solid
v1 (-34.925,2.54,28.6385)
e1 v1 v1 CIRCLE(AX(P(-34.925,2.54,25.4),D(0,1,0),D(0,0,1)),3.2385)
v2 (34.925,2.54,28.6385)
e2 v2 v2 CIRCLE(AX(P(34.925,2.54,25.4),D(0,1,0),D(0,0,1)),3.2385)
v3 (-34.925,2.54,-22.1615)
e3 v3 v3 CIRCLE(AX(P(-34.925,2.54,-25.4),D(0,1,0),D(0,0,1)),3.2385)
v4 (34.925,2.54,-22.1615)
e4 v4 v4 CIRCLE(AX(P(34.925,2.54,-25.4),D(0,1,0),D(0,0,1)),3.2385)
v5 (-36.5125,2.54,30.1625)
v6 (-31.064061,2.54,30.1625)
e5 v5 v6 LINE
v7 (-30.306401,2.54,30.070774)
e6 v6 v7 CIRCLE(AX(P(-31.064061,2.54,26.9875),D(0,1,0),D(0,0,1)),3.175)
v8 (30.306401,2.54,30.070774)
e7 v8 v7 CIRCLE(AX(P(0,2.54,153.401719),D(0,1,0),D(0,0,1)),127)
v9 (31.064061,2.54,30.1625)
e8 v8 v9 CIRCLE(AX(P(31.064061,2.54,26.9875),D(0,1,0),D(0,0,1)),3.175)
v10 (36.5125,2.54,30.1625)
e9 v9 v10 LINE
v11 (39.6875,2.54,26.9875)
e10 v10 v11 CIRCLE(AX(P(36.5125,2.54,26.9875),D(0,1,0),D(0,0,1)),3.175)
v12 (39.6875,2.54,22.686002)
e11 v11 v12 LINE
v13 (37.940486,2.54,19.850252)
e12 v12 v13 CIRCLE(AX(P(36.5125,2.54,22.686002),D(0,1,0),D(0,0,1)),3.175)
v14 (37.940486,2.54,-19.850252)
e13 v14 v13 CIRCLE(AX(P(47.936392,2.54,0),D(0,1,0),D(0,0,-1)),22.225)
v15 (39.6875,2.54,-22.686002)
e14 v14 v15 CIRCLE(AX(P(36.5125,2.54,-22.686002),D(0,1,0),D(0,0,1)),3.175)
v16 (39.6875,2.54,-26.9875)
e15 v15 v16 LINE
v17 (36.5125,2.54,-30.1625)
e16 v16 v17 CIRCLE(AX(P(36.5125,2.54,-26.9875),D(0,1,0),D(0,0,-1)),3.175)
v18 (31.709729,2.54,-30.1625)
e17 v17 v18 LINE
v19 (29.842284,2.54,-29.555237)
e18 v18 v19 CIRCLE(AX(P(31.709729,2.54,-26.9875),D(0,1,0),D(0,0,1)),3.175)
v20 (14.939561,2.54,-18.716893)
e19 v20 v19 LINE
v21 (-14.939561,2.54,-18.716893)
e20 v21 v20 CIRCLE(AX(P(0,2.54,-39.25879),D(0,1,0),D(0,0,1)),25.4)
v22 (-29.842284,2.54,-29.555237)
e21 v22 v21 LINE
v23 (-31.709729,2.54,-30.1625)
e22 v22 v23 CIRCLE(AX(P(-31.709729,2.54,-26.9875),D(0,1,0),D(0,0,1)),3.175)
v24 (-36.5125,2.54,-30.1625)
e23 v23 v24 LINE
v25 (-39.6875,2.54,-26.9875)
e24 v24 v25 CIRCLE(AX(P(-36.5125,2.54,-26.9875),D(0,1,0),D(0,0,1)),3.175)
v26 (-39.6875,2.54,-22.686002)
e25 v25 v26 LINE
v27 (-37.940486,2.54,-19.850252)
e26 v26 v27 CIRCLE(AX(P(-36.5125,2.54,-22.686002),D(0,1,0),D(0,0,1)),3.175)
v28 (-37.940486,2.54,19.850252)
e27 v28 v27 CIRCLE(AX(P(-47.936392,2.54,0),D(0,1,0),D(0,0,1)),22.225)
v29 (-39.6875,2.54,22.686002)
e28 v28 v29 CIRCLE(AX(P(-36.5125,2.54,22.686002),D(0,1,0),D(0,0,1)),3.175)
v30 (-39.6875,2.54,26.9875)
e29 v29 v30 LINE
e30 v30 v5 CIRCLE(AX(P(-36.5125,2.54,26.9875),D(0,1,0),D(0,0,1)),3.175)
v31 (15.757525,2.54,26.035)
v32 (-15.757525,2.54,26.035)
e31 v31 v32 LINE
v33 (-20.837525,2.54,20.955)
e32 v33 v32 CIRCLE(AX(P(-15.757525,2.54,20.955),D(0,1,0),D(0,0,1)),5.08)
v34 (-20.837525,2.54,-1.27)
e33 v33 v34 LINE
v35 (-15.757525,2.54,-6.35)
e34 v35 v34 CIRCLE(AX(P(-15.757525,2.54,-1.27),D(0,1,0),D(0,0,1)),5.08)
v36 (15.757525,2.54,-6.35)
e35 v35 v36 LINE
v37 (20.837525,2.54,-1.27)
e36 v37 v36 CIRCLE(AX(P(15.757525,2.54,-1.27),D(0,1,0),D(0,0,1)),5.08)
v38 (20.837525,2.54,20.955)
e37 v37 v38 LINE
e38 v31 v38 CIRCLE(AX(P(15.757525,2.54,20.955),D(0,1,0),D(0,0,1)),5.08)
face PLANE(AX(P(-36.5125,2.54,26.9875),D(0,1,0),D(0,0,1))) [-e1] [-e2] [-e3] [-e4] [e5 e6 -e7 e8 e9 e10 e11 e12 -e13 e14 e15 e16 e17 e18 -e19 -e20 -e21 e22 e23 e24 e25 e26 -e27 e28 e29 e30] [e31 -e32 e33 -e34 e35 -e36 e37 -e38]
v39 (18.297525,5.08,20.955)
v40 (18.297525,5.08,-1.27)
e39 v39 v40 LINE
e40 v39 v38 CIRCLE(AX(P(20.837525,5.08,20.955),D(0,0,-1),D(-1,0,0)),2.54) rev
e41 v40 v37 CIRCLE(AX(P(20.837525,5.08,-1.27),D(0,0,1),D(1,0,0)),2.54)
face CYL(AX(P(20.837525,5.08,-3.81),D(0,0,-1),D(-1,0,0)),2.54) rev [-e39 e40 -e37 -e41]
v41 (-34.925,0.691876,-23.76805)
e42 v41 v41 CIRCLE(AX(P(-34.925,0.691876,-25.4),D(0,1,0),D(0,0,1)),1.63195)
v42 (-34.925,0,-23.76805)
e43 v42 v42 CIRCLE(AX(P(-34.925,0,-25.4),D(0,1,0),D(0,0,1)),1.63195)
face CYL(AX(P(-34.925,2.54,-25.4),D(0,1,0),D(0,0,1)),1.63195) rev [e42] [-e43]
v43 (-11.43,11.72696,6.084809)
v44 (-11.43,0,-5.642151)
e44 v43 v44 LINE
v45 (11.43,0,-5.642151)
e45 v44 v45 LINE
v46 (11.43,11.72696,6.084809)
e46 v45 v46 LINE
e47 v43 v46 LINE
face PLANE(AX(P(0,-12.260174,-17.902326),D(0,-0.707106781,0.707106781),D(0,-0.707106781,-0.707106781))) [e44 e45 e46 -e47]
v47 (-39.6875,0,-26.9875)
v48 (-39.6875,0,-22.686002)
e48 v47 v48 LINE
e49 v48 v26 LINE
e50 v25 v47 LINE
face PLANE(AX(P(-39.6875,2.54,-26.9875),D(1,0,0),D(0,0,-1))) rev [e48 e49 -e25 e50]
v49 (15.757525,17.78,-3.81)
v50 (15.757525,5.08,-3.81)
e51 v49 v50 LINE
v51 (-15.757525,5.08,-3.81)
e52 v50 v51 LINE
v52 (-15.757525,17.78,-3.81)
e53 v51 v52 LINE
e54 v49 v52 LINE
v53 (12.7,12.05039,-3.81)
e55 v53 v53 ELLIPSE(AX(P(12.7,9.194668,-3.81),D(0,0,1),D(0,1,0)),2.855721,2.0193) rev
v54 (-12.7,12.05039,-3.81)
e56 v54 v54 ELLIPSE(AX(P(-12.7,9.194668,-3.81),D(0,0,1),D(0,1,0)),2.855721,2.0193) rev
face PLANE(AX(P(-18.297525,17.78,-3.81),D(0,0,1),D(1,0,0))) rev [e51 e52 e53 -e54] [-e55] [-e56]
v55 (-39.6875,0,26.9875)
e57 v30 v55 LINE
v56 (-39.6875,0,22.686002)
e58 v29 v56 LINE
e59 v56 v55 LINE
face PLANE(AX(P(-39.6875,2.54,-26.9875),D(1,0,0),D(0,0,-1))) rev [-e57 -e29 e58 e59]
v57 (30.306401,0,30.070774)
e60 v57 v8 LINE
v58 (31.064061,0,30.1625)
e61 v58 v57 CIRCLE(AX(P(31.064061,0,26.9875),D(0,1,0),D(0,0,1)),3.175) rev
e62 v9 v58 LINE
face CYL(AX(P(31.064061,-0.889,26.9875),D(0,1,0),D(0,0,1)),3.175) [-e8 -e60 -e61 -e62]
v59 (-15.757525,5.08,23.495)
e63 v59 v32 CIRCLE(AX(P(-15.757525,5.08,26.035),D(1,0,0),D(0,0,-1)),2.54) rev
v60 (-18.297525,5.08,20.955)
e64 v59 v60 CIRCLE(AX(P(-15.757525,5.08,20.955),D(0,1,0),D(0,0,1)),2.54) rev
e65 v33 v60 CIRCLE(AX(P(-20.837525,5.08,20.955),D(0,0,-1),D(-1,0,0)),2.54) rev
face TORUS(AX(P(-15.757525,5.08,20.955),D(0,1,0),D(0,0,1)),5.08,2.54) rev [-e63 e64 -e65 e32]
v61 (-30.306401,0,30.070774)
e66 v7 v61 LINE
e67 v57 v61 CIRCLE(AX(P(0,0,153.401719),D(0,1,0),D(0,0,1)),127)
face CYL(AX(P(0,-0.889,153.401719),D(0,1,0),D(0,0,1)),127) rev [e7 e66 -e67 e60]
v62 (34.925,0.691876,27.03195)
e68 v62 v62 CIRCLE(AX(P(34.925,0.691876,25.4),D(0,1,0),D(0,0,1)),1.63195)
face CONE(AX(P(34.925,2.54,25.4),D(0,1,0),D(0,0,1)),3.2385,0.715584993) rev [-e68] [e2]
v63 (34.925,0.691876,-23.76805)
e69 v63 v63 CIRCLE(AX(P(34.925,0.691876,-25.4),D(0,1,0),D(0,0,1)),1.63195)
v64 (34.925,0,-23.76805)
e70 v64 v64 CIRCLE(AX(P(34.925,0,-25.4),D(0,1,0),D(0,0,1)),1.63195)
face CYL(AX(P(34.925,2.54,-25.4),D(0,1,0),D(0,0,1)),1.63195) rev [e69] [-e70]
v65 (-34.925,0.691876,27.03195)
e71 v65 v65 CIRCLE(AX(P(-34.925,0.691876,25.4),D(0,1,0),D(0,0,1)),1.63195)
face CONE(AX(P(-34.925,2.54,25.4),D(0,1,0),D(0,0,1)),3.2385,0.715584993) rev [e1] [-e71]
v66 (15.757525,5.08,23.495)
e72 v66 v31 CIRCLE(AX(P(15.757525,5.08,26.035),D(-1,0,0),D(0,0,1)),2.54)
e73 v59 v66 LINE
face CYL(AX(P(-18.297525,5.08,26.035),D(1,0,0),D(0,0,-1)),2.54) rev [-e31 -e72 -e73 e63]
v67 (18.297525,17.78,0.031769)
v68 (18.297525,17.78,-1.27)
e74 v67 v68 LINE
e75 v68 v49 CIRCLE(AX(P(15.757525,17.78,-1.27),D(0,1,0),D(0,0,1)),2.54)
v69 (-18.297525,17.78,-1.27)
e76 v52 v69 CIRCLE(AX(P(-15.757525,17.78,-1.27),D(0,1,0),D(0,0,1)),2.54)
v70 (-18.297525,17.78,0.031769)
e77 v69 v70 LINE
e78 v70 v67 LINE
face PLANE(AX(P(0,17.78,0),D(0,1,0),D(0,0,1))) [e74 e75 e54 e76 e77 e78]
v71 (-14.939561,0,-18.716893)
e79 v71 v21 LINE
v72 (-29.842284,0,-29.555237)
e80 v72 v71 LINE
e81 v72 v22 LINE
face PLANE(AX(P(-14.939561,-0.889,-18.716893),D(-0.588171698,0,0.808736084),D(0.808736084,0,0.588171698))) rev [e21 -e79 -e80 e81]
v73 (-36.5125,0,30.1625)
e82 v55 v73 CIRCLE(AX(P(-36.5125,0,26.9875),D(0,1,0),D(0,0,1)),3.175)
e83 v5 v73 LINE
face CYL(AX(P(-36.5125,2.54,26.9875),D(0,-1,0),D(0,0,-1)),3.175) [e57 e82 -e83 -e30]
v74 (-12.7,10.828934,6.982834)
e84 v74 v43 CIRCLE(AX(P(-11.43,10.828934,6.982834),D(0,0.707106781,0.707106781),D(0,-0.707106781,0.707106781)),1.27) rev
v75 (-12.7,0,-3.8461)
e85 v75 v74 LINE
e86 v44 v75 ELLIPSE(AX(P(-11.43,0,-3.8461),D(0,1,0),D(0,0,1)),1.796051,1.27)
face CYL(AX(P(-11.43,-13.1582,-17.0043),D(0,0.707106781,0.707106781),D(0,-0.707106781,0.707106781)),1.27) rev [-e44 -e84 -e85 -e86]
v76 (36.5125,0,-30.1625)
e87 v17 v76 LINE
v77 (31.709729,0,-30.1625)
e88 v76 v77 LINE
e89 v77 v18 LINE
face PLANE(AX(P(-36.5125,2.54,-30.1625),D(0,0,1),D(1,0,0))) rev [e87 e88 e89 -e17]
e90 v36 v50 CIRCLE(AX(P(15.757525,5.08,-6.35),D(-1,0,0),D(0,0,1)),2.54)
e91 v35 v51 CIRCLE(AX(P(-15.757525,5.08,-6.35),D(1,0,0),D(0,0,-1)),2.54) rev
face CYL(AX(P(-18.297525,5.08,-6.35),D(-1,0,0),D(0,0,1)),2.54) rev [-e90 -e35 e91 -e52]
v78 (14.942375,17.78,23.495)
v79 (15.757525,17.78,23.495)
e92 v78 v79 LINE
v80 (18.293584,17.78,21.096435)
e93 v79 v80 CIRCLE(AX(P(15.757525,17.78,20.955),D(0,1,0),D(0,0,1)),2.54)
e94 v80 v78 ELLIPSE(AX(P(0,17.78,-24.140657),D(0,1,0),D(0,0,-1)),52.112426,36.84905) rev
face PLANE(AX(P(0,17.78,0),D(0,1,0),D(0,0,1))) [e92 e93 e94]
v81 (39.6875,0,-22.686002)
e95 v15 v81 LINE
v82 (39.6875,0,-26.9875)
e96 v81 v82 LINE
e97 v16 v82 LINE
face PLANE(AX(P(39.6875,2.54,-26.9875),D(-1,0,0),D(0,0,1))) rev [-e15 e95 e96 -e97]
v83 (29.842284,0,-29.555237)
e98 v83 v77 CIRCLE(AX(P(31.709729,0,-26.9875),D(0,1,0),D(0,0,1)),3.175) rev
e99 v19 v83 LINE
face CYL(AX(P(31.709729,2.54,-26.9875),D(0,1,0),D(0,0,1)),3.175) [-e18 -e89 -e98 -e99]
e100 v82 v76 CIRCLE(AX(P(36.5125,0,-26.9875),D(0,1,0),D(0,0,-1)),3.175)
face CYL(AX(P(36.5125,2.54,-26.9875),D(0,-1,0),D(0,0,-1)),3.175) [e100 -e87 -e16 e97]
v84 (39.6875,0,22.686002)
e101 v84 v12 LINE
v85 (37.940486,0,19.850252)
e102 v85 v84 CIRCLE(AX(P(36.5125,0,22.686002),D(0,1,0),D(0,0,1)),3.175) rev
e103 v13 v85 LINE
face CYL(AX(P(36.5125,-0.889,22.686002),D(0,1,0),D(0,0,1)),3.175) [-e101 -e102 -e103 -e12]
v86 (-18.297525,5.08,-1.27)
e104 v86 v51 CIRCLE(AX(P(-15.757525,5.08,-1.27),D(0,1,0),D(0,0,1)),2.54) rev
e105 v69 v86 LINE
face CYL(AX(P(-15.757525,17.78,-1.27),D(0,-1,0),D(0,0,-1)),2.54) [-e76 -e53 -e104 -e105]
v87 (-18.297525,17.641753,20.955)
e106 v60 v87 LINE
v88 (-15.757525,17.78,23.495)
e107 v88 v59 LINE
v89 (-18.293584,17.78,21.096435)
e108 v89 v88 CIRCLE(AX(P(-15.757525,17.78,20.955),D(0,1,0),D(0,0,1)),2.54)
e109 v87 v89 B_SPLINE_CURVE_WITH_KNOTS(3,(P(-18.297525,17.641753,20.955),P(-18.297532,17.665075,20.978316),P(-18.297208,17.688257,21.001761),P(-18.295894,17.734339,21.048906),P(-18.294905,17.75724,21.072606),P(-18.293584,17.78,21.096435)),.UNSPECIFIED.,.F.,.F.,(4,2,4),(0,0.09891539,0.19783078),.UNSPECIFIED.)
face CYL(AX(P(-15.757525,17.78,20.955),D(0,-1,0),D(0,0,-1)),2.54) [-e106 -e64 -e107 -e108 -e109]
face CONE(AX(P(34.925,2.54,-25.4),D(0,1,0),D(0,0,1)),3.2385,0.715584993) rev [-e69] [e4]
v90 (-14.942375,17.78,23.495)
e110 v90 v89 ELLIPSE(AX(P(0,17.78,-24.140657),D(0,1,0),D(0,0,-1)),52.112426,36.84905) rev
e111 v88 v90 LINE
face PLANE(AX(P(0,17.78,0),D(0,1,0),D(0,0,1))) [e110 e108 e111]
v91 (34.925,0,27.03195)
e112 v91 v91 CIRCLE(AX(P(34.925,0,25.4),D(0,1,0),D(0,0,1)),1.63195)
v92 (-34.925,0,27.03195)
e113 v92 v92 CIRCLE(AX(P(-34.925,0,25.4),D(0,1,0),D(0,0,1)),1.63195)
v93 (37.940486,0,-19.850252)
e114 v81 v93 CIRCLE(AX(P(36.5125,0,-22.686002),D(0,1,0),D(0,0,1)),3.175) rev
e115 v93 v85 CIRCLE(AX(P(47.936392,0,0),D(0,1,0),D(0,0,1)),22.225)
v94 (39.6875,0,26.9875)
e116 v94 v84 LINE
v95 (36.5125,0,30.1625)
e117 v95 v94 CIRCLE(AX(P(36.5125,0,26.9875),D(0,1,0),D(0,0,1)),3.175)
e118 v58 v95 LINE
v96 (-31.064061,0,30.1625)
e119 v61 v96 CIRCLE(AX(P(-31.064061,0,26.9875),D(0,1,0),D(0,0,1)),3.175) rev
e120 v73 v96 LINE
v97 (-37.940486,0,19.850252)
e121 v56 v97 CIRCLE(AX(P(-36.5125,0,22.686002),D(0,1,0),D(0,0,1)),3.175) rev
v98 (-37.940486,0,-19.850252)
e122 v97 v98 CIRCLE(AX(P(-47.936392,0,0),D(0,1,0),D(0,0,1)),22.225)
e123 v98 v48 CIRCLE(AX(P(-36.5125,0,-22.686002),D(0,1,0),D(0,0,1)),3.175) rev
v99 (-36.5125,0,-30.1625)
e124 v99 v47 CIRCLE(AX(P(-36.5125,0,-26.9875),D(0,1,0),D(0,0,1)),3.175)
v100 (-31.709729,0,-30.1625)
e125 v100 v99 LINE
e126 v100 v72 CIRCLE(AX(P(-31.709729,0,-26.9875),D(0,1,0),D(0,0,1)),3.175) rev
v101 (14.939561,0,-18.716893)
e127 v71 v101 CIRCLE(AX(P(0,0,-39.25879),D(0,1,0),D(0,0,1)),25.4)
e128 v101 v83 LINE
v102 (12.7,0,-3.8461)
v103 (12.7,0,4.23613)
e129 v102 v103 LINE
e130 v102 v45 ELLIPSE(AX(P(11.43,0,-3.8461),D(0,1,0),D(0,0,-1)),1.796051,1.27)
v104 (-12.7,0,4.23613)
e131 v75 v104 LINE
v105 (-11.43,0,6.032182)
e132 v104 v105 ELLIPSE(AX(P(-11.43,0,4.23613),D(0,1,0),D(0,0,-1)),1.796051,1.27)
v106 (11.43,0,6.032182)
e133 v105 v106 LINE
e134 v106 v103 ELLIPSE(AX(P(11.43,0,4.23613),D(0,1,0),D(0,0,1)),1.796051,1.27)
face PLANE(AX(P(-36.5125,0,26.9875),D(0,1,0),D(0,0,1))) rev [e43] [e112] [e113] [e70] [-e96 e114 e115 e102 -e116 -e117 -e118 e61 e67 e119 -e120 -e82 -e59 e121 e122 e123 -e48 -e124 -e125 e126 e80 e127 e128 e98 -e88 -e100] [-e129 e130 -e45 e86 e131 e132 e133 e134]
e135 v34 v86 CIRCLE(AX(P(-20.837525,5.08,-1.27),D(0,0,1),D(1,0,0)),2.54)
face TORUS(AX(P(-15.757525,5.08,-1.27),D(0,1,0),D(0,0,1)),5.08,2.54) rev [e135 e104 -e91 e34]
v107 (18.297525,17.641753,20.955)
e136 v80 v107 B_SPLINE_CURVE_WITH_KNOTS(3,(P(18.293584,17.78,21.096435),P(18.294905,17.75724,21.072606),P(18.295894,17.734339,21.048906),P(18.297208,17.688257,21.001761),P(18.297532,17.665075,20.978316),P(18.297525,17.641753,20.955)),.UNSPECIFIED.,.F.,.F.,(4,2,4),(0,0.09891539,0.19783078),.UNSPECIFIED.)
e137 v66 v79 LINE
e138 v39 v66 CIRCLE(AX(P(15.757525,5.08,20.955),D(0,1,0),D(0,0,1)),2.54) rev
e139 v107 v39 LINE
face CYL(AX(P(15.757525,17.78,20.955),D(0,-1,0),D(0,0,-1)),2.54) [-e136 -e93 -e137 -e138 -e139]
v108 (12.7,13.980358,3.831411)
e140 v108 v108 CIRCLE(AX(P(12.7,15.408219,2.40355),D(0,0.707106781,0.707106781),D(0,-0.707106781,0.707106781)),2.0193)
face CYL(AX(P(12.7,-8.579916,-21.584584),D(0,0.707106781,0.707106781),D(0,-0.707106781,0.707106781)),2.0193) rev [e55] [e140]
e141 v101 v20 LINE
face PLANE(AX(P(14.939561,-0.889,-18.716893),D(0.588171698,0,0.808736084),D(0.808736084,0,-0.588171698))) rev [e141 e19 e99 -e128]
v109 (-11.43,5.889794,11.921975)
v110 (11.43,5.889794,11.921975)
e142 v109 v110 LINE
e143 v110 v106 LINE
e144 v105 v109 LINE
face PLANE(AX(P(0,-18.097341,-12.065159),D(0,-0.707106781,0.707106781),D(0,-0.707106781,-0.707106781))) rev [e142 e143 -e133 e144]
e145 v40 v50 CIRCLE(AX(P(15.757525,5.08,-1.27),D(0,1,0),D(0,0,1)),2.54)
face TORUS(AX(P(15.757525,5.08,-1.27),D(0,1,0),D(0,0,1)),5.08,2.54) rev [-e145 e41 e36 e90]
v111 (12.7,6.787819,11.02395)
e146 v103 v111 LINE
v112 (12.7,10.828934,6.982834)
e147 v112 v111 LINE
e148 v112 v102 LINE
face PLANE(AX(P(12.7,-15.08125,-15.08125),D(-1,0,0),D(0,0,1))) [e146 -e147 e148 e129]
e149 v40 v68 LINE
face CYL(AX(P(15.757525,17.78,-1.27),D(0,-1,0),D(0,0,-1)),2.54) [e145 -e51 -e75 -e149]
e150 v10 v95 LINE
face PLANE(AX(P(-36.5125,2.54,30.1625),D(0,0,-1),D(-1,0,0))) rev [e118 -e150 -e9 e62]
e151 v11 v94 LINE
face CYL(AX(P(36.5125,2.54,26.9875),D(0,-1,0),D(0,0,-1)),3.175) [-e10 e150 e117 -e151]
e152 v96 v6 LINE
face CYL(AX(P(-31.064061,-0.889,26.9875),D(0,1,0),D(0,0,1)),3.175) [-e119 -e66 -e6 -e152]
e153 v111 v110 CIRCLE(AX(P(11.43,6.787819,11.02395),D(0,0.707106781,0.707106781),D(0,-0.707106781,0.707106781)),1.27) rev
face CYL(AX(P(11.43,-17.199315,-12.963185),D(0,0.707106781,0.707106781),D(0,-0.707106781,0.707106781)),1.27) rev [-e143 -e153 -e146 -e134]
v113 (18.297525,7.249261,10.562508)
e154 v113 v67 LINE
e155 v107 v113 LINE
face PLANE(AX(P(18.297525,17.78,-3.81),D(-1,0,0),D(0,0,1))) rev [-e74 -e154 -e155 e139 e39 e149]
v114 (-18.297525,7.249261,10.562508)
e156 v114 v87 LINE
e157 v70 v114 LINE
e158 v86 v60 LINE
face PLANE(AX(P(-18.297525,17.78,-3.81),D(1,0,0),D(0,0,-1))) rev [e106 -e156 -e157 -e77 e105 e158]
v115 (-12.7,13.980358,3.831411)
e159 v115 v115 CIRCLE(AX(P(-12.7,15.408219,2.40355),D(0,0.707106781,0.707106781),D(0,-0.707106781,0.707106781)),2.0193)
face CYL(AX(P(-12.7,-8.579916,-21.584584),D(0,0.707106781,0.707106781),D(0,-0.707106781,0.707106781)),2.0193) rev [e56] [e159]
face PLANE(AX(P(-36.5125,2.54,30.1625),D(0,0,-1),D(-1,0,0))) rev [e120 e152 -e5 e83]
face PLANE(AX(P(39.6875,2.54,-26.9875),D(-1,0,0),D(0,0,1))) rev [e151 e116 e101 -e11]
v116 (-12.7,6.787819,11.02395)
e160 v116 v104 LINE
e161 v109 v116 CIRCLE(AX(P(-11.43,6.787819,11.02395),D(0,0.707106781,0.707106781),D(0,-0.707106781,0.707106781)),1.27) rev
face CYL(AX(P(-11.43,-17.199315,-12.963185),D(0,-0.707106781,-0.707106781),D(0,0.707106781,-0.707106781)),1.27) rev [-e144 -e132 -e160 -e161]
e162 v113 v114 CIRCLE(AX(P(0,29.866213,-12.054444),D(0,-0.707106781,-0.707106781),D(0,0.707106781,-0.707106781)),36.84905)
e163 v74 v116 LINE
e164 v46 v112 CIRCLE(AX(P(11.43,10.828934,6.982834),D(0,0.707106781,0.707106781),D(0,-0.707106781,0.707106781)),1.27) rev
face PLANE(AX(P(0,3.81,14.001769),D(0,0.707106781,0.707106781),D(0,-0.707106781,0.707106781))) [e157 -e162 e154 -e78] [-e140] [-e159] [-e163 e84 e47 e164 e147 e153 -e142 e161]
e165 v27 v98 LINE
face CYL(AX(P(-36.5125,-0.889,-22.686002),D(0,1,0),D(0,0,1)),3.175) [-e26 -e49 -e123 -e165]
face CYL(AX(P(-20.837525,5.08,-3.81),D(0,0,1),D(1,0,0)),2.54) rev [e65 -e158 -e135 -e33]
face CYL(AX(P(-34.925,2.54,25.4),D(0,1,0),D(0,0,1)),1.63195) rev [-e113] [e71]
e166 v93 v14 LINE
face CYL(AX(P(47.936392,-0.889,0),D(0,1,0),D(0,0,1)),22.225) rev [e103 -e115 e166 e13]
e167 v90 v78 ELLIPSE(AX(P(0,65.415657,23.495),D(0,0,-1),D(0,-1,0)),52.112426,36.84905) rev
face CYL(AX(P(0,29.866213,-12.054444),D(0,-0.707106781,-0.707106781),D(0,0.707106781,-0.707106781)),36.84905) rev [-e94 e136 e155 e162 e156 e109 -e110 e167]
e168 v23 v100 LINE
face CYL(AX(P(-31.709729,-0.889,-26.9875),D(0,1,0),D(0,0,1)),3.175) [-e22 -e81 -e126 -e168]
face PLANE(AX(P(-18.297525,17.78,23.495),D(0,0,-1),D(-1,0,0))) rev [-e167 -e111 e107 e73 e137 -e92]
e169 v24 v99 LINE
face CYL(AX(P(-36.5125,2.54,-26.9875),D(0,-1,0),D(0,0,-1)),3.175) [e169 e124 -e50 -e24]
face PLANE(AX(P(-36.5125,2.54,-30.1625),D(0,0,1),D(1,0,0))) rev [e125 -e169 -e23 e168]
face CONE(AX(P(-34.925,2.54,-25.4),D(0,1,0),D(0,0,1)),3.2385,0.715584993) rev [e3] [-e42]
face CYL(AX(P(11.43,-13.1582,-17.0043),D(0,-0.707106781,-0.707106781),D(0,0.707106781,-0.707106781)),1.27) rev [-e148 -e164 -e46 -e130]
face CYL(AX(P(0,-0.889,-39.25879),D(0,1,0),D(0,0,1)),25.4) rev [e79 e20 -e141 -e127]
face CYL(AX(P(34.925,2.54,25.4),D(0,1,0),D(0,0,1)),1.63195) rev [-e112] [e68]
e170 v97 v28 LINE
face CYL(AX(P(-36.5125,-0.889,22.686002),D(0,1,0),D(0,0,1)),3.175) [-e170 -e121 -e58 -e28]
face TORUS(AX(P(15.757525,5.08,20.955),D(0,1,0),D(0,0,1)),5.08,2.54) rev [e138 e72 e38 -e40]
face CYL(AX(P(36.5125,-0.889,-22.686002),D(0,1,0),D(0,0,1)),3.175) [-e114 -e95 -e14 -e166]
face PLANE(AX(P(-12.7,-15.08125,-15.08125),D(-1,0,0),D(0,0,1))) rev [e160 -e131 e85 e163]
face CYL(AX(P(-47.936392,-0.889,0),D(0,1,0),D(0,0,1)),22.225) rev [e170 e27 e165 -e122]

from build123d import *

# Parameters (mm, degrees)
BOSS_EXTRUDE1_DEPTH                           = 2.54
CSK_FOR_4_FLAT_HEAD_MACHINE_SCREW1_AT_2_COUNT = 2
CSK_FOR_4_FLAT_HEAD_MACHINE_SCREW1_AT_2_PITCH = 50.8
CSK_FOR_4_FLAT_HEAD_MACHINE_SCREW1_AT_3_COUNT = 2
CSK_FOR_4_FLAT_HEAD_MACHINE_SCREW1_AT_3_PITCH = 86.36933773
CSK_FOR_4_FLAT_HEAD_MACHINE_SCREW1_AT_4_COUNT = 2
CSK_FOR_4_FLAT_HEAD_MACHINE_SCREW1_AT_4_PITCH = 69.85
SKETCH5_W                                     = 36.59505
SKETCH5_H                                     = 27.305
BOSS_EXTRUDE2_DEPTH                           = 15.24
CUT_EXTRUDE2_REACH                            = 58.398
SKETCH8_R                                     = 2.0193
FILLET1_R                                     = 2.54
CUT_EXTRUDE4_DEPTH                            = 3.429
FILLET2_R                                     = 3.175
SKETCH10_W                                    = 25.4
SKETCH10_H                                    = 8.255
CUT_EXTRUDE5_DEPTH                            = 57.398148028
FILLET3_R                                     = 1.27


with BuildPart() as part:
    # Sketch1 → Boss-Extrude1 (new body)
    with BuildSketch(Plane(origin=(0, 0, 0), x_dir=(1, 0, 0), z_dir=(0, 1, 0))):
        with BuildLine():
            Line((-36.5125, 30.1625), (36.5125, 30.1625))
            ThreePointArc((36.5125, 30.1625), (38.75756403, 29.23256403), (39.6875, 26.9875))
            Line((39.6875, 26.9875), (39.6875, -26.9875))
            ThreePointArc((39.6875, -26.9875), (38.75756403, -29.23256403), (36.5125, -30.1625))
            Line((36.5125, -30.1625), (-36.5125, -30.1625))
            ThreePointArc((-36.5125, -30.1625), (-38.75756403, -29.23256403), (-39.6875, -26.9875))
            Line((-39.6875, -26.9875), (-39.6875, 26.9875))
            ThreePointArc((-39.6875, 26.9875), (-38.75756403, 29.23256403), (-36.5125, 30.1625))
        make_face()
    extrude(amount=BOSS_EXTRUDE1_DEPTH)

    # Sketch3 → CSK for #4 Flat Head Machine Screw1 (revolve, cut)
    with BuildSketch(Plane(origin=(-34.925, 2.54, -25.4), x_dir=(0, 0, 1), z_dir=(1, 0, 0))):
        Polygon((0, 0), (0, 2.54), (1.63195, 2.54), (1.63195, 1.848124365), (3.2385, 0), align=None)
    csk_for_4_flat_head_machine_screw1 = revolve(axis=Axis((-34.925, 8.89, -25.4), (0, -1, 0)), mode=Mode.SUBTRACT)

    # CSK for #4 Flat Head Machine Screw1 at 2: CSK for #4 Flat Head Machine Screw1 ×2
    with Locations(*[(0, 0, i * CSK_FOR_4_FLAT_HEAD_MACHINE_SCREW1_AT_2_PITCH) for i in range(1, CSK_FOR_4_FLAT_HEAD_MACHINE_SCREW1_AT_2_COUNT)]):
        add(csk_for_4_flat_head_machine_screw1, mode=Mode.SUBTRACT)

    # CSK for #4 Flat Head Machine Screw1 at 3: CSK for #4 Flat Head Machine Screw1 ×2
    with Locations(*[Vector(0.8087360843031886, 0, 0.5881716976750463) * (i * CSK_FOR_4_FLAT_HEAD_MACHINE_SCREW1_AT_3_PITCH) for i in range(1, CSK_FOR_4_FLAT_HEAD_MACHINE_SCREW1_AT_3_COUNT)]):
        add(csk_for_4_flat_head_machine_screw1, mode=Mode.SUBTRACT)

    # CSK for #4 Flat Head Machine Screw1 at 4: CSK for #4 Flat Head Machine Screw1 ×2
    with Locations(*[(i * CSK_FOR_4_FLAT_HEAD_MACHINE_SCREW1_AT_4_PITCH, 0, 0) for i in range(1, CSK_FOR_4_FLAT_HEAD_MACHINE_SCREW1_AT_4_COUNT)]):
        add(csk_for_4_flat_head_machine_screw1, mode=Mode.SUBTRACT)

    # Sketch5 → Boss-Extrude2 (add)
    with BuildSketch(Plane(origin=(0, 2.54, 0), x_dir=(1, 0, 0), z_dir=(0, 1, 0))):
        with Locations((0, -9.8425)):
            Rectangle(SKETCH5_W, SKETCH5_H)
    extrude(amount=BOSS_EXTRUDE2_DEPTH)

    # Sketch4 → Cut-Revolve1 (revolve, cut)
    with BuildSketch(Plane(origin=(0, 0, 0), x_dir=(0, 0, -1), z_dir=(1, 0, 0))):
        Polygon((-32.244261254, 22.052492284), (-6.188048119, 48.10870542), (12.054444166, 29.866213135), (-14.00176897, 3.81), align=None)
    revolve(axis=Axis((0, 29.866213135, -12.054444166), (0, 0.7071067811865511, 0.707106781186544)), mode=Mode.SUBTRACT)

    # Cut-Extrude2: up to this plane
    cut_extrude2_end = Plane(origin=(-18.297525, 17.78, -3.81), z_dir=(0, 0, 1))
    # Sketch8 → Cut-Extrude2 (cut, up to the surface)
    with BuildSketch(Plane(origin=(0, 8.905884485, 8.905884485), x_dir=(1, 0, 0), z_dir=(0, 0.7071067811865511, 0.707106781186544)), mode=Mode.PRIVATE) as cut_extrude2_sk1:
        with Locations(Location((-12.7, 9.195689, 0), (0, 0, 270))):
            Circle(SKETCH8_R)
    cut_extrude2_tool1 = split(extrude(cut_extrude2_sk1.sketch, amount=-CUT_EXTRUDE2_REACH, mode=Mode.PRIVATE), bisect_by=cut_extrude2_end, keep=Keep.BOTH, mode=Mode.PRIVATE)
    add(cut_extrude2_tool1.solids().sort_by_distance((-12.7, 15.408219, 2.40355))[0], mode=Mode.SUBTRACT)
    # Sketch8 → Cut-Extrude2 (cut, up to the surface)
    with BuildSketch(Plane(origin=(0, 8.905884485, 8.905884485), x_dir=(1, 0, 0), z_dir=(0, 0.7071067811865511, 0.707106781186544)), mode=Mode.PRIVATE) as cut_extrude2_sk2:
        with Locations(Location((12.7, 9.195689, 0), (0, 0, 270))):
            Circle(SKETCH8_R)
    cut_extrude2_tool2 = split(extrude(cut_extrude2_sk2.sketch, amount=-CUT_EXTRUDE2_REACH, mode=Mode.PRIVATE), bisect_by=cut_extrude2_end, keep=Keep.BOTH, mode=Mode.PRIVATE)
    add(cut_extrude2_tool2.solids().sort_by_distance((12.7, 15.408219, 2.40355))[0], mode=Mode.SUBTRACT)

    # Fillet1
    # the kernel refuses this fillet: 2.54 mm, written as the material it takes off along each edge
    with BuildSketch(Plane(origin=(18.297525, 2.54, -3.81), x_dir=(-1, 0, 0), z_dir=(0, 1, 0)), Plane(origin=(18.297525, 2.54, 23.495), x_dir=(0, 0, -1), z_dir=(0, 1, 0)), Plane(origin=(-18.297525, 2.54, 23.495), x_dir=(1, 0, 0), z_dir=(0, 1, 0))) as fillet1_piece_1:
        with BuildLine():
            CenterArc((FILLET1_R, FILLET1_R), FILLET1_R, 180, 90)
            Line((0, FILLET1_R), (0, 0))
            Line((0, 0), (FILLET1_R, 0))
        make_face()
    extrude(amount=21.59, mode=Mode.SUBTRACT)
    with BuildSketch(Plane(origin=(-18.297525, 2.54, -3.81), x_dir=(1, 0, 0), z_dir=(0, 1, 0))) as fillet1_piece_2:
        with BuildLine():
            CenterArc((FILLET1_R, -FILLET1_R), FILLET1_R, 90, 90)
            Line((0, -FILLET1_R), (0, 0))
            Line((0, 0), (FILLET1_R, 0))
        make_face()
    extrude(amount=21.59, mode=Mode.SUBTRACT)
    # the kernel refuses this fillet: 2.54 mm, written as the material it adds along each edge
    with BuildSketch(Plane(origin=(-15.757525, 2.54, -3.81), x_dir=(0, 0, -1), z_dir=(1, 0, 0)), Plane(origin=(15.757525, 2.54, 23.495), x_dir=(0, 0, 1), z_dir=(-1, 0, 0))) as fillet1_2_piece_1:
        with BuildLine():
            CenterArc((FILLET1_R, FILLET1_R), FILLET1_R, 180, 90)
            Line((0, FILLET1_R), (0, 0))
            Line((0, 0), (FILLET1_R, 0))
        make_face()
    extrude(amount=31.51505)
    with BuildSketch(Plane(origin=(18.297525, 2.54, -1.27), x_dir=(1, 0, 0), z_dir=(0, 0, 1)), Plane(origin=(-18.297525, 2.54, 20.955), x_dir=(-1, 0, 0), z_dir=(0, 0, -1))) as fillet1_2_piece_2:
        with BuildLine():
            CenterArc((FILLET1_R, FILLET1_R), FILLET1_R, 180, 90)
            Line((0, FILLET1_R), (0, 0))
            Line((0, 0), (FILLET1_R, 0))
        make_face()
    extrude(amount=22.225)
    with BuildSketch(Plane(origin=(-15.757525, 2.54, 20.955), x_dir=(0, 0, 1), z_dir=(1, 0, 0))) as fillet1_2_piece_3:
        with BuildLine():
            CenterArc((2.54 + FILLET1_R, -FILLET1_R), FILLET1_R, 90, 90)
            Line((2.54, -FILLET1_R), (2.54, 0))
            Line((2.54, 0), (2.54 + FILLET1_R, 0))
        make_face()
    revolve(axis=Axis((-15.757525, 2.54, 20.955), (0, -1, 0)), revolution_arc=90)
    with BuildSketch(Plane(origin=(-15.757525, 2.54, -1.27), x_dir=(0, 0, -1), z_dir=(1, 0, 0))) as fillet1_2_piece_4:
        with BuildLine():
            CenterArc((2.54 + FILLET1_R, FILLET1_R), FILLET1_R, 180, 90)
            Line((2.54, FILLET1_R), (2.54, 0))
            Line((2.54, 0), (2.54 + FILLET1_R, 0))
        make_face()
    revolve(axis=Axis((-15.757525, 2.54, -1.27), (0, 1, 0)), revolution_arc=90)
    with BuildSketch(Plane(origin=(15.757525, 2.54, 20.955), x_dir=(1, 0, 0), z_dir=(0, 0, -1))) as fillet1_2_piece_5:
        with BuildLine():
            CenterArc((2.54 + FILLET1_R, -FILLET1_R), FILLET1_R, 90, 90)
            Line((2.54, -FILLET1_R), (2.54, 0))
            Line((2.54, 0), (2.54 + FILLET1_R, 0))
        make_face()
    revolve(axis=Axis((15.757525, 2.54, 20.955), (0, -1, 0)), revolution_arc=90)
    with BuildSketch(Plane(origin=(15.757525, 2.54, -1.27), x_dir=(0, 0, -1), z_dir=(-1, 0, 0))) as fillet1_2_piece_6:
        with BuildLine():
            CenterArc((2.54 + FILLET1_R, -FILLET1_R), FILLET1_R, 90, 90)
            Line((2.54, -FILLET1_R), (2.54, 0))
            Line((2.54, 0), (2.54 + FILLET1_R, 0))
        make_face()
    revolve(axis=Axis((15.757525, 2.54, -1.27), (0, -1, 0)), revolution_arc=90)

    # Sketch9 → Cut-Extrude4 (cut)
    with BuildSketch(Plane(origin=(0, 2.54, 0), x_dir=(1, 0, 0), z_dir=(0, 1, 0))):
        with BuildLine():
            Line((-30.677270284, 30.1625), (30.677270284, 30.1625))
            Line((30.677270284, 30.1625), (14.939561121, 18.716893336))
            ThreePointArc((14.939561121, 18.716893336), (0, 13.858789877), (-14.939561121, 18.716893336))
            Line((-14.939561121, 18.716893336), (-30.677270284, 30.1625))
        make_face()
        with BuildLine():
            Line((-39.6875, 20.6375), (-39.6875, -20.6375))
            ThreePointArc((-39.6875, -20.6375), (-25.711391971, 0), (-39.6875, 20.6375))
        make_face()
        with BuildLine():
            Line((39.6875, 20.6375), (39.6875, -20.6375))
            ThreePointArc((39.6875, -20.6375), (25.711391971, 0), (39.6875, 20.6375))
        make_face()
        with BuildLine():
            Line((-30.677270284, -30.1625), (30.677270284, -30.1625))
            ThreePointArc((30.677270284, -30.1625), (0, -26.401718952), (-30.677270284, -30.1625))
        make_face()
    extrude(amount=-CUT_EXTRUDE4_DEPTH, mode=Mode.SUBTRACT)

    # Fillet2
    fillet2_edges = [part.edges().sort_by_distance(p)[0] for p in [
        (-39.6875, 1.27, -20.6375),
        (-39.6875, 1.27, 20.6375),
        (-30.677270284, 1.27, 30.1625),
        (30.677270284, 1.27, 30.1625),
        (39.6875, 1.27, 20.6375),
        (39.6875, 1.27, -20.6375),
        (30.677270284, 1.27, -30.1625),
        (-30.677270284, 1.27, -30.1625),
    ]]
    fillet(fillet2_edges, radius=FILLET2_R)

    # Sketch10 → Cut-Extrude5 (cut, through all)
    with BuildSketch(Plane(origin=(0, 8.905884485, 8.905884485), x_dir=(1, 0, 0), z_dir=(0, 0.7071067811865529, 0.7071067811865422))):
        with Locations((0, -0.1378966)):
            Rectangle(SKETCH10_W, SKETCH10_H)
    extrude(amount=-CUT_EXTRUDE5_DEPTH, mode=Mode.SUBTRACT)

    # Fillet3
    fillet3_edges = [part.edges().sort_by_distance(p)[0] for p in [
        (12.7, 5.863480052, 0.221328815),
        (12.7, 2.944896812, 8.977078533),
        (-12.7, 2.944896812, 8.977078533),
        (-12.7, 5.863480052, 0.221328815),
    ]]
    fillet(fillet3_edges, radius=FILLET3_R)


solid = part.part
